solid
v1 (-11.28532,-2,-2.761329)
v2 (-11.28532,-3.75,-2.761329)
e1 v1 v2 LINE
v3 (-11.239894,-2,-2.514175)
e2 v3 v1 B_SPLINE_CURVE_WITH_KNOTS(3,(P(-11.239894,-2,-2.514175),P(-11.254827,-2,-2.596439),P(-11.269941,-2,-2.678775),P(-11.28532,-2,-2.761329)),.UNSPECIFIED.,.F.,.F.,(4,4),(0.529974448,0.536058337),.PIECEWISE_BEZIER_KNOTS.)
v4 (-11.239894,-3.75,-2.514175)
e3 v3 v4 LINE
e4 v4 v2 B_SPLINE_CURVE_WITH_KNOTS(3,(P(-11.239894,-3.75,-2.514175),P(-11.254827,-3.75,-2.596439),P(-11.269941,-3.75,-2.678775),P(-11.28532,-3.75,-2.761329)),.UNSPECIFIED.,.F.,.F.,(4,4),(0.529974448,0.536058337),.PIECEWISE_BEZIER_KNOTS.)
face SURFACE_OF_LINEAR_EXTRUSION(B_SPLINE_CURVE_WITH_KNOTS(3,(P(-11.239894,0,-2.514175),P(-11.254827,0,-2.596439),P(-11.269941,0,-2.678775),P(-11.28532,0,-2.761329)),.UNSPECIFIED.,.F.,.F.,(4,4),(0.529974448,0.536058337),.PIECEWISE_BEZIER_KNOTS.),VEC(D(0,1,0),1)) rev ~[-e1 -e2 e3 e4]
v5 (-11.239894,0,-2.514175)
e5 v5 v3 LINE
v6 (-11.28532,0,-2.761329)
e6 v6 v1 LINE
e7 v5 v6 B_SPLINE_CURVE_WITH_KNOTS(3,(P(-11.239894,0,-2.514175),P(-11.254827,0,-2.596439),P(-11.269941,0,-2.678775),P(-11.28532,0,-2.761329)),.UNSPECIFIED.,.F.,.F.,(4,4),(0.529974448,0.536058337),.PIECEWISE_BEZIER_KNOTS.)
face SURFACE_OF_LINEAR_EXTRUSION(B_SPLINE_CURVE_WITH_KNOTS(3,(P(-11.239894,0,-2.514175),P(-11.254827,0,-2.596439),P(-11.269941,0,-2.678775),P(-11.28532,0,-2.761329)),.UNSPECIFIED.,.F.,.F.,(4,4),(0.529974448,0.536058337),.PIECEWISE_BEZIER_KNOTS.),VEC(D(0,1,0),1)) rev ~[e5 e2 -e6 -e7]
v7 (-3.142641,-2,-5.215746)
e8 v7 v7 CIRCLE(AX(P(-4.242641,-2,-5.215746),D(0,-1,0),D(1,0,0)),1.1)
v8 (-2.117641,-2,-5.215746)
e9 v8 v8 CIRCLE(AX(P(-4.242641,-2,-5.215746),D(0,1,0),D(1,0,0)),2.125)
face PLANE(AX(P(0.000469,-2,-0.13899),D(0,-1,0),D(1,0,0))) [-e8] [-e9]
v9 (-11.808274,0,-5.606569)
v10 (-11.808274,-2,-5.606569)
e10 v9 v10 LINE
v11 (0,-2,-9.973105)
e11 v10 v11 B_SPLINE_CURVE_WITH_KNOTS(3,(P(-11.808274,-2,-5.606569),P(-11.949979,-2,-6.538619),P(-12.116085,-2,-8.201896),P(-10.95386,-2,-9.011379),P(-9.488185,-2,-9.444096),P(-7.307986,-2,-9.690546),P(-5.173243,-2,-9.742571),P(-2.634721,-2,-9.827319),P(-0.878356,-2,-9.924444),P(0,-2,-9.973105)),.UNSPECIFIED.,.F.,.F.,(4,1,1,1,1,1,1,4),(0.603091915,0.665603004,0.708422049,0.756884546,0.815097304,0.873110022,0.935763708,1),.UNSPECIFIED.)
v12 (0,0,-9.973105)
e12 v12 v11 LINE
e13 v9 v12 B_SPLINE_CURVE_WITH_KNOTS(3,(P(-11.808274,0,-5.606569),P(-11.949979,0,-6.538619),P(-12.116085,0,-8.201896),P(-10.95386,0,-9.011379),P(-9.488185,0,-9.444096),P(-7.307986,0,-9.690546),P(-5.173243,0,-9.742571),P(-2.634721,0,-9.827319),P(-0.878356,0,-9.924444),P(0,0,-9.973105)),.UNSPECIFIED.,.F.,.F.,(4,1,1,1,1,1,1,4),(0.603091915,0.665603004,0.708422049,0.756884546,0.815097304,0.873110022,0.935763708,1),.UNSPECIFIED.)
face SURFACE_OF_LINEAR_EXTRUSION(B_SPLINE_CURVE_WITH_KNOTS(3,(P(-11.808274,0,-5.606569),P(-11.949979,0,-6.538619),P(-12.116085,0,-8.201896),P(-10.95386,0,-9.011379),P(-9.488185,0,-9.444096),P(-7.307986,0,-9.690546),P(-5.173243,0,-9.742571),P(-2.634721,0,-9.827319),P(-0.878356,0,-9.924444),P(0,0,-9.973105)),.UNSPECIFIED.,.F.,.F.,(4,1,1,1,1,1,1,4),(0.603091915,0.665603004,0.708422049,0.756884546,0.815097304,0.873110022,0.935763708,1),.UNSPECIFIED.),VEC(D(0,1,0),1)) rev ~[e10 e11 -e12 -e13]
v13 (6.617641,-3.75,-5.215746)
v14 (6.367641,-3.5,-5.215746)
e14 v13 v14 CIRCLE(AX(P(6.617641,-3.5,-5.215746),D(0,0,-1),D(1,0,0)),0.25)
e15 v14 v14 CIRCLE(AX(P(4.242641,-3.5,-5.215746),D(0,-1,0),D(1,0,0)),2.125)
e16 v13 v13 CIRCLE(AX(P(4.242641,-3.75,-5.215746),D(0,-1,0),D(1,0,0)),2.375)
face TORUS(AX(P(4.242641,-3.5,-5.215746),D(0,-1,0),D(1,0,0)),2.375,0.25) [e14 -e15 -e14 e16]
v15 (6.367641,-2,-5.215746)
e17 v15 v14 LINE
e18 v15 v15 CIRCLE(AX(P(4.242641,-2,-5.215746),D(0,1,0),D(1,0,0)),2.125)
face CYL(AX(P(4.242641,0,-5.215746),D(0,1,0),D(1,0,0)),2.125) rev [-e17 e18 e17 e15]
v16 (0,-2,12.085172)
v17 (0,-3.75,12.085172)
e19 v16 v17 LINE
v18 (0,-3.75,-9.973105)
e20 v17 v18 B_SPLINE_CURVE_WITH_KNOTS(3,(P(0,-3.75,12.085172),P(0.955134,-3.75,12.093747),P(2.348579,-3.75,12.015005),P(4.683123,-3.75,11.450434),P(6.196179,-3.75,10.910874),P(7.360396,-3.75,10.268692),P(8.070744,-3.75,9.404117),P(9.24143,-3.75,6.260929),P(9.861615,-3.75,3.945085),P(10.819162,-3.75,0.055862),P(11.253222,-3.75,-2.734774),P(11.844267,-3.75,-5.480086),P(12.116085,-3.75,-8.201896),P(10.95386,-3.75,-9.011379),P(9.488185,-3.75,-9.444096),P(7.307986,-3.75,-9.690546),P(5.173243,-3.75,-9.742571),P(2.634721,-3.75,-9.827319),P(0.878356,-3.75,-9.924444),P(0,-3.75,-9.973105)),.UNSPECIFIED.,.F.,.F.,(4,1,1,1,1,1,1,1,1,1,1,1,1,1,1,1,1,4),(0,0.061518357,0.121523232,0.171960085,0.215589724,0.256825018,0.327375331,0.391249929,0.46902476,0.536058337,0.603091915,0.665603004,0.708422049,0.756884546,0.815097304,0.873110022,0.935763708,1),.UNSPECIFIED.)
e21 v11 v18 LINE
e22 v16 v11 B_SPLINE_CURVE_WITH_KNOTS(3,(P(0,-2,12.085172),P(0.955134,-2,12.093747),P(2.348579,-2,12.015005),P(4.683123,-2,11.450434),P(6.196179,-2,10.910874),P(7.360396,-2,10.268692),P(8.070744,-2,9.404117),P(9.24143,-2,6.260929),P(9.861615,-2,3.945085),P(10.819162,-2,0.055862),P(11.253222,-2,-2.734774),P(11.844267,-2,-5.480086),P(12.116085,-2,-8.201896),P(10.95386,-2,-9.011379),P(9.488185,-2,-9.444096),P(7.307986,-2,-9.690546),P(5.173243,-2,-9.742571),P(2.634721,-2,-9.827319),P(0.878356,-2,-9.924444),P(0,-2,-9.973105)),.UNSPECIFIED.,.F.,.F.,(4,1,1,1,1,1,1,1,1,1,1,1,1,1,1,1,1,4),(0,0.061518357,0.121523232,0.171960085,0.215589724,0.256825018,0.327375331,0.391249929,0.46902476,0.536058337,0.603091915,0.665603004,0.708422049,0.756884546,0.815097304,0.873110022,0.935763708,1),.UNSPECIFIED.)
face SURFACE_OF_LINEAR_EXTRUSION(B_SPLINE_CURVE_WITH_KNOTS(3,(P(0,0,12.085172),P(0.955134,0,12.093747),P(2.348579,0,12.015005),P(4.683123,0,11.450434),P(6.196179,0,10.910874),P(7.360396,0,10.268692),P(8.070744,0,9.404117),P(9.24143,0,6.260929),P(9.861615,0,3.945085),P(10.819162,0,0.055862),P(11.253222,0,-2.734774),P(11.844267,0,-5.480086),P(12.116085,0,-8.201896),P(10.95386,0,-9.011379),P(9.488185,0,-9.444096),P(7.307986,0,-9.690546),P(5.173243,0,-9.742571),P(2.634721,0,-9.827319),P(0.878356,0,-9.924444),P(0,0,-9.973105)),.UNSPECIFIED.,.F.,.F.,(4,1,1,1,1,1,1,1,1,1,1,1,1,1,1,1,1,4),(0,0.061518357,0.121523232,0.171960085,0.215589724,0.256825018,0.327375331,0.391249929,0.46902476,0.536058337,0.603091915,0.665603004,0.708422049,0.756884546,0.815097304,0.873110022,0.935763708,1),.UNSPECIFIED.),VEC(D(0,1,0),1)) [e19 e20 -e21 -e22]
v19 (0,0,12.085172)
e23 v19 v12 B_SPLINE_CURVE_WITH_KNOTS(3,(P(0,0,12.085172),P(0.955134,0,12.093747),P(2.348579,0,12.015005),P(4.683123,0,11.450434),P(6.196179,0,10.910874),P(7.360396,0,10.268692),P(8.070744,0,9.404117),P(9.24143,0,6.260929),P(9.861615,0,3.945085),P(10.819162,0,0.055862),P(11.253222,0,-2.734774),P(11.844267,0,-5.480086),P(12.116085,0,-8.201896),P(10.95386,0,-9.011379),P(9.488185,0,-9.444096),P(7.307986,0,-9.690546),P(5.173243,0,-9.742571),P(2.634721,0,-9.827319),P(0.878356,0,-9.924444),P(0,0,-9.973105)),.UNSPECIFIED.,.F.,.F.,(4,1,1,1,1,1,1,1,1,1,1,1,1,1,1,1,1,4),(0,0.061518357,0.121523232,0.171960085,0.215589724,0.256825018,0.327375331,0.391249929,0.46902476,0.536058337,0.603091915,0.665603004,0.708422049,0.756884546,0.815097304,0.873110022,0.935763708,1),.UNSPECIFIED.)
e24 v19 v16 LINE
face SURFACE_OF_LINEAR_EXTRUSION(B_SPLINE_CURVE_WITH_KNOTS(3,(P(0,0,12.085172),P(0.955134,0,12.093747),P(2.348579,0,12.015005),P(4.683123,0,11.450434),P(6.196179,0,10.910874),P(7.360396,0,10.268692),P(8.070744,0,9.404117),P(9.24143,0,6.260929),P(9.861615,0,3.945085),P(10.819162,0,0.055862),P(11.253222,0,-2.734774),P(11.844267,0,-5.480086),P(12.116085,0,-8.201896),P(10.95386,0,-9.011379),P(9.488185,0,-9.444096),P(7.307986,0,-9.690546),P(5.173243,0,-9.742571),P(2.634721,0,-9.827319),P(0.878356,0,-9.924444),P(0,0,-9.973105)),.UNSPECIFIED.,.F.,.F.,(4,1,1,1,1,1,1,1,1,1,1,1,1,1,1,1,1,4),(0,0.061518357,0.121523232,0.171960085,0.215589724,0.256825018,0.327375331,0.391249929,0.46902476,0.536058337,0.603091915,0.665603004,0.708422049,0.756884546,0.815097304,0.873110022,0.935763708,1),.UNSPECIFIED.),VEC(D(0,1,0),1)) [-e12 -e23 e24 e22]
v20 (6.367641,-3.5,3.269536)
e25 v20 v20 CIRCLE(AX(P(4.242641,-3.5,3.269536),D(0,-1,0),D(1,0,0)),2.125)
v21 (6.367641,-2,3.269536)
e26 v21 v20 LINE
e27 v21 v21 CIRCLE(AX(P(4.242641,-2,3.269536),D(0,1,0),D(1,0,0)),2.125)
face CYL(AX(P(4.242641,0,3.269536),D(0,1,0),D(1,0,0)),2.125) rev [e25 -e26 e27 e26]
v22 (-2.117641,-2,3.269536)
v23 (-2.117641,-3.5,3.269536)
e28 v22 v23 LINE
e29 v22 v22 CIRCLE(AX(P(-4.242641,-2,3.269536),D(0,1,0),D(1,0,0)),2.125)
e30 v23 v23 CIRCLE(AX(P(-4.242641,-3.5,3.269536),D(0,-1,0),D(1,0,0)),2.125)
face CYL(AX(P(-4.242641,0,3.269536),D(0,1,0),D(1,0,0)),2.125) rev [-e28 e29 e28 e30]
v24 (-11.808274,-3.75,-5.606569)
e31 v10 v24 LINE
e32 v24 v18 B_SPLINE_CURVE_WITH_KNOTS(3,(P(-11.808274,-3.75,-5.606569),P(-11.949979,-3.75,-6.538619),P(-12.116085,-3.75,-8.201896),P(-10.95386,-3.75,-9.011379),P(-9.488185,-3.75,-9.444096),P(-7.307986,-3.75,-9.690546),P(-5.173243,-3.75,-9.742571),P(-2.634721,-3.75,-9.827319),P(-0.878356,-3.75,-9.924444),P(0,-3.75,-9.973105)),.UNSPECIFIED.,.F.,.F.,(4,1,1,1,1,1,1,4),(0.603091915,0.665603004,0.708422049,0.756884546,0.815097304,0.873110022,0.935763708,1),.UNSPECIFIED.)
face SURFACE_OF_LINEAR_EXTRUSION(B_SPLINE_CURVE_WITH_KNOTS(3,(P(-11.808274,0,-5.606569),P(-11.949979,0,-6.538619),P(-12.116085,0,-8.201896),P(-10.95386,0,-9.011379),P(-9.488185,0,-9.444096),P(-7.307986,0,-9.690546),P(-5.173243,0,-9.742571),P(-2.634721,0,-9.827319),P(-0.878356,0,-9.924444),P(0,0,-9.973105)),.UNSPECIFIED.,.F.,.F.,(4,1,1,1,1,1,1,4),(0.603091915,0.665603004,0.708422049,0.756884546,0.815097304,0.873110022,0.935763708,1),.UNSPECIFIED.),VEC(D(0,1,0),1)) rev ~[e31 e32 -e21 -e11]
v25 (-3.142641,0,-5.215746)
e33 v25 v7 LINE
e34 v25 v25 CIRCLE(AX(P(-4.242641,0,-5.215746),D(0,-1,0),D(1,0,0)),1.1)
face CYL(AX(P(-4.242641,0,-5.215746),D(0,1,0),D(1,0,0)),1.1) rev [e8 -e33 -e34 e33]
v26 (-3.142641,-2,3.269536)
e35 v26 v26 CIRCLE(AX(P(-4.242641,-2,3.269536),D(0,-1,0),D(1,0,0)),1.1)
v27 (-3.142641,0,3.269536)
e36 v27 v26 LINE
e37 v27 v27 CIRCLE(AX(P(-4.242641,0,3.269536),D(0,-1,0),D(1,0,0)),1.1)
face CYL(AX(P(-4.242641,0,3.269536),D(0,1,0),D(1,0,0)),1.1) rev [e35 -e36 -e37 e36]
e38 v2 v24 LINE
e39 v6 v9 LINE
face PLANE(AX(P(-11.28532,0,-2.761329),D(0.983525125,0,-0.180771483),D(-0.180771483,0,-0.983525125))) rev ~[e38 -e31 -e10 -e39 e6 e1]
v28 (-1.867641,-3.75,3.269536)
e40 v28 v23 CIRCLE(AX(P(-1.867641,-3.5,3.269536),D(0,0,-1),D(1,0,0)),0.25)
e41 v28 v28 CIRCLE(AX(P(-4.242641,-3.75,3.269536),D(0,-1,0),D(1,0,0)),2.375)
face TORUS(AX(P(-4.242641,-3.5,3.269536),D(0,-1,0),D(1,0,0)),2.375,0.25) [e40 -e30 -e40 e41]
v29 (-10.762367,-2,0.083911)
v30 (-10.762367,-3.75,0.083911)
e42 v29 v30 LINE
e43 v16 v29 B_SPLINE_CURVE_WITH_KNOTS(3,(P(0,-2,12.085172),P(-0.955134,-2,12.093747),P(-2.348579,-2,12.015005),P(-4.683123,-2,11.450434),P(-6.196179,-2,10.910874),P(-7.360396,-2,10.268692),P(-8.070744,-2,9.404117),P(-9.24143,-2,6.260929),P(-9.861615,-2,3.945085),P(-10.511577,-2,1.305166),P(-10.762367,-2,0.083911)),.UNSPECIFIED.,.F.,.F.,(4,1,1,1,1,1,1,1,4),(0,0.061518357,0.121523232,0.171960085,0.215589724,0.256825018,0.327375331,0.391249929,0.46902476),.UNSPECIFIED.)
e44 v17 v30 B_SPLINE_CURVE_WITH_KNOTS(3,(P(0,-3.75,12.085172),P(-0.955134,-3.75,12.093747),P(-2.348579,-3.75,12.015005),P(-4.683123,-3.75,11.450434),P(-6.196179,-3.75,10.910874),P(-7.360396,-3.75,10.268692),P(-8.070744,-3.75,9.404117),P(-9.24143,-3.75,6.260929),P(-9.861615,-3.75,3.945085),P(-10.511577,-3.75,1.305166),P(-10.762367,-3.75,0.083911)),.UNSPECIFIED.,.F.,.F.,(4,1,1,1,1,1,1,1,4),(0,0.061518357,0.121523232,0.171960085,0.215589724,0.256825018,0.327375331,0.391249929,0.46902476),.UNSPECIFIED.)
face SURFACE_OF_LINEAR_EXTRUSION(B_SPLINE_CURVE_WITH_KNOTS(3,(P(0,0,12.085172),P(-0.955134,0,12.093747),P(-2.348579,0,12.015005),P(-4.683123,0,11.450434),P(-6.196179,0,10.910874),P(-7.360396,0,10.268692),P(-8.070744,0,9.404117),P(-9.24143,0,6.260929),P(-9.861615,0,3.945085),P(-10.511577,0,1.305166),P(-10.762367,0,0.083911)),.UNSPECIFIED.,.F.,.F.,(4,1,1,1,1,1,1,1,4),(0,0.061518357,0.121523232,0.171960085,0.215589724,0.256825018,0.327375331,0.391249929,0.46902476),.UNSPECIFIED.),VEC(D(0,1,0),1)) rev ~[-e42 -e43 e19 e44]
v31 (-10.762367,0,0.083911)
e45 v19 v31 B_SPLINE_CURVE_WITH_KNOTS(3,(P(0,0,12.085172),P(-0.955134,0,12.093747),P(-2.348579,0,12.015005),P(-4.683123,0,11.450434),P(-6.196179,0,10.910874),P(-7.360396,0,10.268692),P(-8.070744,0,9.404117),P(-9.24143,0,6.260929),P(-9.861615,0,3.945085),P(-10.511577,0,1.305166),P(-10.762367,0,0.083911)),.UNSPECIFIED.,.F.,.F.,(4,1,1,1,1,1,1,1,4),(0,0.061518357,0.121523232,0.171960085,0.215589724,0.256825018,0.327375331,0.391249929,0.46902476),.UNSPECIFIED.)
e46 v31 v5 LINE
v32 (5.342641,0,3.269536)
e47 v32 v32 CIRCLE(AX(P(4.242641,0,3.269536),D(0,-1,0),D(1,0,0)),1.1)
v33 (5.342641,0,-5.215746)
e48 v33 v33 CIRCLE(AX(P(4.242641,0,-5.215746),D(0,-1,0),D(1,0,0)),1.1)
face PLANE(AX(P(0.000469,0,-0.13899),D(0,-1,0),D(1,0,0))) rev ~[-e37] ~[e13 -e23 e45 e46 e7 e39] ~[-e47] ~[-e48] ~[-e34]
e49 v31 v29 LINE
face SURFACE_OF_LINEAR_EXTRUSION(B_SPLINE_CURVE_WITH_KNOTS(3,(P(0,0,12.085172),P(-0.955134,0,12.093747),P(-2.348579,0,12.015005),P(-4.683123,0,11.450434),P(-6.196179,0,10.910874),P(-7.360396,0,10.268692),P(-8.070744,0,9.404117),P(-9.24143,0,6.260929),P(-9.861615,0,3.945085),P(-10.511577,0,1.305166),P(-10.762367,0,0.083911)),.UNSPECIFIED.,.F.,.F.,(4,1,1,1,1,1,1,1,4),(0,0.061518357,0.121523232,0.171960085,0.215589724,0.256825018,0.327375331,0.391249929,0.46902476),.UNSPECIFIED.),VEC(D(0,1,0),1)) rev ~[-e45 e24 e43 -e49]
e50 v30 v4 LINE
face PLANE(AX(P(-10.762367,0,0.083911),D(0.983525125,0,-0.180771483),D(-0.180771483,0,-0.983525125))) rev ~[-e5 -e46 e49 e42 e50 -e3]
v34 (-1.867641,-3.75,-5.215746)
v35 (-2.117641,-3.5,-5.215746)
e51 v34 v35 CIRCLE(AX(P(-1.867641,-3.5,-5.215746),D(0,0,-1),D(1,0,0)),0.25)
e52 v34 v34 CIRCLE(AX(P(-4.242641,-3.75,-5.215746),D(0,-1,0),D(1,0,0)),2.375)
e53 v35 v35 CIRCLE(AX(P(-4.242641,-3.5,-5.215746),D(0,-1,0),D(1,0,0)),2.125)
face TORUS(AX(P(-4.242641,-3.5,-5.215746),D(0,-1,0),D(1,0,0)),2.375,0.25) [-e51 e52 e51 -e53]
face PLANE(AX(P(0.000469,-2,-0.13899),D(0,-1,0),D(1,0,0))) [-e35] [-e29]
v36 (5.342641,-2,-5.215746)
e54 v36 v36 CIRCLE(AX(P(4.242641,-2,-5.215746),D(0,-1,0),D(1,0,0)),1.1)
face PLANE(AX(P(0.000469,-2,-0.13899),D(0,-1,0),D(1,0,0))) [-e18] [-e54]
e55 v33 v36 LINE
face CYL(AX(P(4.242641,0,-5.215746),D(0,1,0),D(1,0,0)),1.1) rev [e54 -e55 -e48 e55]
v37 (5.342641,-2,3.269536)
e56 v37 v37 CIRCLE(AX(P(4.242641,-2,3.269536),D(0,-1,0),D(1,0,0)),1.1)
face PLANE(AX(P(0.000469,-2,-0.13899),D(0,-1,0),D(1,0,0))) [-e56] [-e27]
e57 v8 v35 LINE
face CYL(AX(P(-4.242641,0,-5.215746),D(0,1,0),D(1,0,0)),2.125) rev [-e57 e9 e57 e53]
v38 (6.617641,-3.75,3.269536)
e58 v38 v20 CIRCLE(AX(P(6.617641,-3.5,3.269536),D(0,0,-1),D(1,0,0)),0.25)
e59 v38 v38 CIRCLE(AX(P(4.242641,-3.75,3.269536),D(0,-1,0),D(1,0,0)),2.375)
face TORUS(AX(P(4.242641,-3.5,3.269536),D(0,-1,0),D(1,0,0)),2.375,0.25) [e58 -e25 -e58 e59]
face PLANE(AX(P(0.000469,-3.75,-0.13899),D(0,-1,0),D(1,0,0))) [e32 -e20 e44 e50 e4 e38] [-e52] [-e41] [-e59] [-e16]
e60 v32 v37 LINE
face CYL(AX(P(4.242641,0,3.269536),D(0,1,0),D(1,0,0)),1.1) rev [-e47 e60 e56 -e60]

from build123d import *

# Parameters (mm, degrees)
F0_R     = 2.125
F0_R_2   = 1.1
F1_DEPTH = 2
F2_DEPTH = 3.75
F3_R     = 0.25


# Not quite as in the source:
# - a feature of the source that left no trace in its solid (it failed there, or was rolled back) is left out


with BuildPart() as f1:
    # F0 (on Front) → F1 (new body)
    with BuildSketch(Plane.XZ):
        with BuildLine():
            Line((-11.2853205, -2.761329), (-11.8082743138, -5.6065687805))
            add(Edge.make_bspline(
                [(-11.8082743138, -5.6065687805), (-11.9499793699, -6.5386188687), (-12.1160849764, -8.2018960588), (-10.9538603761, -9.0113788314), (-9.4881850802, -9.4440964683), (-7.3079859676, -9.6905458476), (-5.1732434914, -9.7425713575), (-2.6347207257, -9.8273186305), (-0.8783558838, -9.9244436474), (0, -9.973105)],
                knots=[0.6030919147, 0.6030919147, 0.6030919147, 0.6030919147, 0.6656030044, 0.7084220489, 0.7568845459, 0.8150973045, 0.873110022, 0.9357637082, 1, 1, 1, 1], degree=3))
            add(Edge.make_bspline(
                [(0, 12.0851723477), (0.9551344788, 12.0937472566), (2.3485794737, 12.0150050235), (4.6831228194, 11.4504344151), (6.1961787746, 10.9108739557), (7.3603958573, 10.268692138), (8.0707440931, 9.4041166376), (9.2414301503, 6.2609292886), (9.8616147158, 3.9450852254), (10.8191617953, 0.0558623263), (11.2532218847, -2.7347737553), (11.8442674277, -5.4800858922), (12.1160849764, -8.2018960588), (10.9538603761, -9.0113788314), (9.4881850802, -9.4440964683), (7.3079859676, -9.6905458476), (5.1732434914, -9.7425713575), (2.6347207257, -9.8273186305), (0.8783558838, -9.9244436474), (0, -9.973105)],
                knots=[0, 0, 0, 0, 0.061518357, 0.1215232323, 0.1719600852, 0.2155897239, 0.256825018, 0.3273753313, 0.3912499287, 0.4690247596, 0.5360583372, 0.6030919147, 0.6656030044, 0.7084220489, 0.7568845459, 0.8150973045, 0.873110022, 0.9357637082, 1, 1, 1, 1], degree=3))
            add(Edge.make_bspline(
                [(0, 12.0851723477), (-0.9551344788, 12.0937472566), (-2.3485794737, 12.0150050235), (-4.6831228194, 11.4504344151), (-6.1961787746, 10.9108739557), (-7.3603958573, 10.268692138), (-8.0707440931, 9.4041166376), (-9.2414301503, 6.2609292886), (-9.8616147158, 3.9450852254), (-10.5115765842, 1.3051663784), (-10.7623666862, 0.0839107805)],
                knots=[0, 0, 0, 0, 0.061518357, 0.1215232323, 0.1719600852, 0.2155897239, 0.256825018, 0.3273753313, 0.3912499287, 0.4690247596, 0.4690247596, 0.4690247596, 0.4690247596], degree=3))
            Line((-10.7623666862, 0.0839107805), (-11.2398937874, -2.5141754531))
            add(Edge.make_bspline(
                [(-11.2398937874, -2.5141754531), (-11.2548268967, -2.5964389646), (-11.2699414976, -2.6787746124), (-11.2853205, -2.761329)],
                knots=[0.5299744481, 0.5299744481, 0.5299744481, 0.5299744481, 0.5360583372, 0.5360583372, 0.5360583372, 0.5360583372], degree=3))
        make_face()
        with Locations((-4.242641, -5.215746)):
            Circle(F0_R, mode=Mode.SUBTRACT)
        with Locations((4.242641, -5.215746)):
            Circle(F0_R, mode=Mode.SUBTRACT)
        with Locations((-4.242641, 3.269536)):
            Circle(F0_R, mode=Mode.SUBTRACT)
        with Locations((4.242641, 3.269536)):
            Circle(F0_R, mode=Mode.SUBTRACT)
        with Locations((4.242641, 3.269536)):
            Circle(F0_R)
        with Locations((4.242641, 3.269536)):
            Circle(F0_R_2, mode=Mode.SUBTRACT)
        with Locations((4.242641, -5.215746)):
            Circle(F0_R)
        with Locations((4.242641, -5.215746)):
            Circle(F0_R_2, mode=Mode.SUBTRACT)
        with Locations((-4.242641, -5.215746)):
            Circle(F0_R)
        with Locations((-4.242641, -5.215746)):
            Circle(F0_R_2, mode=Mode.SUBTRACT)
        with Locations((-4.242641, 3.269536)):
            Circle(F0_R)
        with Locations((-4.242641, 3.269536)):
            Circle(F0_R_2, mode=Mode.SUBTRACT)
    extrude(amount=F1_DEPTH)

    # F0 (on Front) → F2 (join)
    with BuildSketch(Plane.XZ):
        with BuildLine():
            Line((-11.2853205, -2.761329), (-11.8082743138, -5.6065687805))
            add(Edge.make_bspline(
                [(-11.8082743138, -5.6065687805), (-11.9499793699, -6.5386188687), (-12.1160849764, -8.2018960588), (-10.9538603761, -9.0113788314), (-9.4881850802, -9.4440964683), (-7.3079859676, -9.6905458476), (-5.1732434914, -9.7425713575), (-2.6347207257, -9.8273186305), (-0.8783558838, -9.9244436474), (0, -9.973105)],
                knots=[0.6030919147, 0.6030919147, 0.6030919147, 0.6030919147, 0.6656030044, 0.7084220489, 0.7568845459, 0.8150973045, 0.873110022, 0.9357637082, 1, 1, 1, 1], degree=3))
            add(Edge.make_bspline(
                [(0, 12.0851723477), (0.9551344788, 12.0937472566), (2.3485794737, 12.0150050235), (4.6831228194, 11.4504344151), (6.1961787746, 10.9108739557), (7.3603958573, 10.268692138), (8.0707440931, 9.4041166376), (9.2414301503, 6.2609292886), (9.8616147158, 3.9450852254), (10.8191617953, 0.0558623263), (11.2532218847, -2.7347737553), (11.8442674277, -5.4800858922), (12.1160849764, -8.2018960588), (10.9538603761, -9.0113788314), (9.4881850802, -9.4440964683), (7.3079859676, -9.6905458476), (5.1732434914, -9.7425713575), (2.6347207257, -9.8273186305), (0.8783558838, -9.9244436474), (0, -9.973105)],
                knots=[0, 0, 0, 0, 0.061518357, 0.1215232323, 0.1719600852, 0.2155897239, 0.256825018, 0.3273753313, 0.3912499287, 0.4690247596, 0.5360583372, 0.6030919147, 0.6656030044, 0.7084220489, 0.7568845459, 0.8150973045, 0.873110022, 0.9357637082, 1, 1, 1, 1], degree=3))
            add(Edge.make_bspline(
                [(0, 12.0851723477), (-0.9551344788, 12.0937472566), (-2.3485794737, 12.0150050235), (-4.6831228194, 11.4504344151), (-6.1961787746, 10.9108739557), (-7.3603958573, 10.268692138), (-8.0707440931, 9.4041166376), (-9.2414301503, 6.2609292886), (-9.8616147158, 3.9450852254), (-10.5115765842, 1.3051663784), (-10.7623666862, 0.0839107805)],
                knots=[0, 0, 0, 0, 0.061518357, 0.1215232323, 0.1719600852, 0.2155897239, 0.256825018, 0.3273753313, 0.3912499287, 0.4690247596, 0.4690247596, 0.4690247596, 0.4690247596], degree=3))
            Line((-10.7623666862, 0.0839107805), (-11.2398937874, -2.5141754531))
            add(Edge.make_bspline(
                [(-11.2398937874, -2.5141754531), (-11.2548268967, -2.5964389646), (-11.2699414976, -2.6787746124), (-11.2853205, -2.761329)],
                knots=[0.5299744481, 0.5299744481, 0.5299744481, 0.5299744481, 0.5360583372, 0.5360583372, 0.5360583372, 0.5360583372], degree=3))
        make_face()
        with Locations((-4.242641, -5.215746)):
            Circle(F0_R, mode=Mode.SUBTRACT)
        with Locations((4.242641, -5.215746)):
            Circle(F0_R, mode=Mode.SUBTRACT)
        with Locations((-4.242641, 3.269536)):
            Circle(F0_R, mode=Mode.SUBTRACT)
        with Locations((4.242641, 3.269536)):
            Circle(F0_R, mode=Mode.SUBTRACT)
    extrude(amount=F2_DEPTH)

    # F3
    f3_edges = [f1.edges().sort_by_distance(p)[0] for p in [
        (-6.367641, -3.75, 3.269536),
        (2.117641, -3.75, 3.269536),
        (2.117641, -3.75, -5.215746),
        (-6.367641, -3.75, -5.215746),
    ]]
    fillet(f3_edges, radius=F3_R)


solid = f1.part
